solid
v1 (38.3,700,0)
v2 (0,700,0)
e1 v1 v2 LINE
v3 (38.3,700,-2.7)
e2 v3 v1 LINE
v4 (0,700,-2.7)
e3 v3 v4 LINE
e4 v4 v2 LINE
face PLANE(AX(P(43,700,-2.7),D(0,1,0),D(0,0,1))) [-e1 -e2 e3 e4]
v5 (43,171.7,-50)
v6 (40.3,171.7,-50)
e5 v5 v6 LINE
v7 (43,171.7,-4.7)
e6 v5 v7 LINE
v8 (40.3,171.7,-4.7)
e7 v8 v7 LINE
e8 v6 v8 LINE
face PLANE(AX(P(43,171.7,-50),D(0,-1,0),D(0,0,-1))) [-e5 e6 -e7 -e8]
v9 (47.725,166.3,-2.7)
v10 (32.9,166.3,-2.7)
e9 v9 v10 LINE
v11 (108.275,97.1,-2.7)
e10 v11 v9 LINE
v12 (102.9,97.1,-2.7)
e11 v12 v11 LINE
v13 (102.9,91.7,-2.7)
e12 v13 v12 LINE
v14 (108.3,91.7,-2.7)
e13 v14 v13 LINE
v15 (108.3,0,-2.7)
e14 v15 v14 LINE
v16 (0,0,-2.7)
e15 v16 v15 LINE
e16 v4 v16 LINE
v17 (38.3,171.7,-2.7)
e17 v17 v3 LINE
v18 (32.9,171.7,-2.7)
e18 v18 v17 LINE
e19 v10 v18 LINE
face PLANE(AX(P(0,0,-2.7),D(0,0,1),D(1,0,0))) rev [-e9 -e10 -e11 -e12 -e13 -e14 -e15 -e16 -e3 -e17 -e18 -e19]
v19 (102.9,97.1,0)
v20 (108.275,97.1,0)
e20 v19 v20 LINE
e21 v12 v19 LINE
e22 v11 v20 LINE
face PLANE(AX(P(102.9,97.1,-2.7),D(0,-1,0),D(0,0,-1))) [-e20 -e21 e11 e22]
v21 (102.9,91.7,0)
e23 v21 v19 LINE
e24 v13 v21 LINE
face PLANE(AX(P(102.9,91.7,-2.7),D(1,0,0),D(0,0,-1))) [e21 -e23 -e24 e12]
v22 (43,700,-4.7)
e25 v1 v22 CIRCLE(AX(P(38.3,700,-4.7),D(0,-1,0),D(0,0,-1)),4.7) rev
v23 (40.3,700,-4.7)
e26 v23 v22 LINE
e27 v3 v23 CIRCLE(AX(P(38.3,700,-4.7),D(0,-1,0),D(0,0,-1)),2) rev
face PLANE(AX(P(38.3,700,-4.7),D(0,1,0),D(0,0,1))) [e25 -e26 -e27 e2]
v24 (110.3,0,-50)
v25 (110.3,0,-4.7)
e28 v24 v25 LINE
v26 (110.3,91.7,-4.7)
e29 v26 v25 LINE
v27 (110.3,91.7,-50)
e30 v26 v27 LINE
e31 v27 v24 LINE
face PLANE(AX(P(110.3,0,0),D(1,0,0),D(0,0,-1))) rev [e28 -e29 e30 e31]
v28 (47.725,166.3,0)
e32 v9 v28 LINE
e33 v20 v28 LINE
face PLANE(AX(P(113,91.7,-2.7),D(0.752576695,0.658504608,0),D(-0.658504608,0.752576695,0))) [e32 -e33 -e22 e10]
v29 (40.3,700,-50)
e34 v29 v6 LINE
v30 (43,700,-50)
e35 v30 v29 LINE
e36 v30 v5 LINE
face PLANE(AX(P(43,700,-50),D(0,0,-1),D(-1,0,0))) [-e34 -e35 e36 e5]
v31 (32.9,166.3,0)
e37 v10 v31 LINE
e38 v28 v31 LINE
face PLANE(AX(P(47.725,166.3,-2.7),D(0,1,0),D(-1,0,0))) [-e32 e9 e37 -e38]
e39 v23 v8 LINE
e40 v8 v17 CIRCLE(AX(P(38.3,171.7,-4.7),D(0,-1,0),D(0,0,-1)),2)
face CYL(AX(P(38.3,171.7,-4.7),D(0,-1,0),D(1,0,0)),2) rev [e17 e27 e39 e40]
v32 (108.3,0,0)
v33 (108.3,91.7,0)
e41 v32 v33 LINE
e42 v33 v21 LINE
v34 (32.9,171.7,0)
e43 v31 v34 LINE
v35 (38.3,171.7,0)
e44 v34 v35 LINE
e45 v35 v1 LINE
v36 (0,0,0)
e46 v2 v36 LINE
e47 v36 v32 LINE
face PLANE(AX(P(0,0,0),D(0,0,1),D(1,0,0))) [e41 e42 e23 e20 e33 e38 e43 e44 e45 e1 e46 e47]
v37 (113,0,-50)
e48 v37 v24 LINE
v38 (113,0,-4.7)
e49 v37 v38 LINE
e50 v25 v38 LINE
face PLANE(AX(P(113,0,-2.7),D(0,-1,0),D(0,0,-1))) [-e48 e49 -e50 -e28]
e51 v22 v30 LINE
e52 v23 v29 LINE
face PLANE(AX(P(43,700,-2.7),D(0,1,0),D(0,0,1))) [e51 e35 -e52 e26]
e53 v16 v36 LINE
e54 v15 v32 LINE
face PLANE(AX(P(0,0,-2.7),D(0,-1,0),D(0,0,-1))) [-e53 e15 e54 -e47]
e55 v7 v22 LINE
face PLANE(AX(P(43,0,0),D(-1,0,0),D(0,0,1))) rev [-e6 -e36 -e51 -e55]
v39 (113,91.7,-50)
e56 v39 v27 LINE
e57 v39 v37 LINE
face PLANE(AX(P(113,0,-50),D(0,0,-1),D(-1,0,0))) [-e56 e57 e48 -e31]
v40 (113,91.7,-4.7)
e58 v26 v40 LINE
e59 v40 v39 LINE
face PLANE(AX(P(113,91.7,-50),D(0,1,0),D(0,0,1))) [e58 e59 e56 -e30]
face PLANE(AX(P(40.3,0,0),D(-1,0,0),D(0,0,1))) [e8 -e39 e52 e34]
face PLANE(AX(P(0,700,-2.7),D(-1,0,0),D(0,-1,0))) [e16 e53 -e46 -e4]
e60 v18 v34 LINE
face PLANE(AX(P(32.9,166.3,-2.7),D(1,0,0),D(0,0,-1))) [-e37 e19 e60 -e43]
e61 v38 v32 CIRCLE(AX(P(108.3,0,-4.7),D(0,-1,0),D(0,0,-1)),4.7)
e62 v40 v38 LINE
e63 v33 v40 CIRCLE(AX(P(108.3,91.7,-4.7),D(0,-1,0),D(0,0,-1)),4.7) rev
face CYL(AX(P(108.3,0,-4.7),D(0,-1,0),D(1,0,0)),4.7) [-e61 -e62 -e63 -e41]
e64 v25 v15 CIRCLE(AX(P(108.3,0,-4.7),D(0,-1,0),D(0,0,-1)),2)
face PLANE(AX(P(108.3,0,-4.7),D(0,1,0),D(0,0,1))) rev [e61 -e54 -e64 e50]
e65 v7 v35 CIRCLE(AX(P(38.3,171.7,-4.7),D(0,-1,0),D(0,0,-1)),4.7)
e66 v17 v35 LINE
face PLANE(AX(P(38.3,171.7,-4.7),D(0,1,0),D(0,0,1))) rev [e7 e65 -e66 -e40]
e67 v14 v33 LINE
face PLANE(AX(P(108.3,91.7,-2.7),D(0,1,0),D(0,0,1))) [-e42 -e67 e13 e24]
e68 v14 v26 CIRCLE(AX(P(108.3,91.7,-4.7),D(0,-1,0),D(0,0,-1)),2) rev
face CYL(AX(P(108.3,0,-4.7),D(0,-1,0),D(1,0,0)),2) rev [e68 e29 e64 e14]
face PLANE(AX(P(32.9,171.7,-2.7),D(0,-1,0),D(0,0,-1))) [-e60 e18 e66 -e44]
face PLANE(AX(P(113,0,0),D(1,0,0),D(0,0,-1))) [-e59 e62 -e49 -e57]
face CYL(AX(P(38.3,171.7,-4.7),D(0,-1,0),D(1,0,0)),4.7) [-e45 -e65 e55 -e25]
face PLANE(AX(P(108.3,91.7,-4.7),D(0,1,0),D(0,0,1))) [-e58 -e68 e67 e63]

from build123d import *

# Parameters (mm, degrees)
BASE_FLANGE1_DEPTH              = 2.7
EDGE_FLANGE1_STRIP_W            = 14.8
EDGE_FLANGE1_STRIP_H            = 2.7
EDGE_FLANGE1_STRIP_CUT_DEPTH    = 91.7
EDGE_FLANGE1_RELIEF_W           = 20.2
EDGE_FLANGE1_RELIEF_H           = 5.4
EDGE_FLANGE1_RELIEF_CUT_DEPTH   = 2.7
EDGE_FLANGE1_STRIP_2_W          = 14.8
EDGE_FLANGE1_STRIP_2_H          = 2.7
EDGE_FLANGE1_STRIP_CUT_2_DEPTH  = 528.3
EDGE_FLANGE1_RELIEF_2_W         = 20.2
EDGE_FLANGE1_RELIEF_2_H         = 5.4
EDGE_FLANGE1_RELIEF_CUT_2_DEPTH = 2.7
EDGE_FLANGE1_DEPTH              = 91.7
EDGE_FLANGE1_BEND_DEPTH         = 528.3


# Sheet-metal steps are written as plain solids
with BuildPart() as part:
    # Sketch1 → Base-Flange1 (new body)
    with BuildSketch(Plane.XY):
        Polygon((43, 700), (0, 700), (0, 0), (113, 0), (113, 91.7), (43, 171.7), align=None)
    extrude(amount=-BASE_FLANGE1_DEPTH)

    # Edge-Flange1 strip (across the edge) → Edge-Flange1 strip cut (cut)
    with BuildSketch(Plane(origin=(113, 91.7, -2.7), x_dir=(-1, 0, 0), z_dir=(0, -1, 0))):
        with Locations((-2.7, -1.35)):
            Rectangle(EDGE_FLANGE1_STRIP_W, EDGE_FLANGE1_STRIP_H)
    extrude(amount=EDGE_FLANGE1_STRIP_CUT_DEPTH, mode=Mode.SUBTRACT)

    # Edge-Flange1 relief (on the sheet) → Edge-Flange1 relief cut (cut)
    with BuildSketch(Plane(origin=(108.3, 91.7, -2.7), x_dir=(-1, 0, 0), z_dir=(0, 0, -1))):
        with Locations((-4.7, 2.7)):
            Rectangle(EDGE_FLANGE1_RELIEF_W, EDGE_FLANGE1_RELIEF_H)
    extrude(amount=-EDGE_FLANGE1_RELIEF_CUT_DEPTH, mode=Mode.SUBTRACT)

    # Edge-Flange1 strip 2 (across the edge) → Edge-Flange1 strip cut 2 (cut)
    with BuildSketch(Plane(origin=(43, 700, -2.7), x_dir=(-1, 0, 0), z_dir=(0, -1, 0))):
        with Locations((-2.7, -1.35)):
            Rectangle(EDGE_FLANGE1_STRIP_2_W, EDGE_FLANGE1_STRIP_2_H)
    extrude(amount=EDGE_FLANGE1_STRIP_CUT_2_DEPTH, mode=Mode.SUBTRACT)

    # Edge-Flange1 relief 2 (on the sheet) → Edge-Flange1 relief cut 2 (cut)
    with BuildSketch(Plane(origin=(38.3, 700, -2.7), x_dir=(-1, 0, 0), z_dir=(0, 0, -1))):
        with Locations((-4.7, -531)):
            Rectangle(EDGE_FLANGE1_RELIEF_2_W, EDGE_FLANGE1_RELIEF_2_H)
    extrude(amount=-EDGE_FLANGE1_RELIEF_CUT_2_DEPTH, mode=Mode.SUBTRACT)

    # Edge-Flange1 section (across the edge) → Edge-Flange1 (add)
    with BuildSketch(Plane(origin=(113, 91.7, -2.7), x_dir=(-1, 0, 0), z_dir=(0, -1, 0))):
        with BuildLine():
            Line((0, 2), (0, 47.3))
            Line((0, 47.3), (2.7, 47.3))
            Line((2.7, 47.3), (2.7, 2))
            ThreePointArc((2.7, 2), (3.285786438, 0.585786438), (4.7, 0))
            Line((4.7, 0), (4.7, -2.7))
            ThreePointArc((4.7, -2.7), (1.376598128, -1.323401872), (0, 2))
        make_face()
    extrude(amount=EDGE_FLANGE1_DEPTH)

    # Edge-Flange1 section 2 (across the edge) → Edge-Flange1 bend (add)
    with BuildSketch(Plane(origin=(43, 700, -2.7), x_dir=(-1, 0, 0), z_dir=(0, -1, 0))):
        with BuildLine():
            Line((0, 2), (0, 47.3))
            Line((0, 47.3), (2.7, 47.3))
            Line((2.7, 47.3), (2.7, 2))
            ThreePointArc((2.7, 2), (3.285786438, 0.585786438), (4.7, 0))
            Line((4.7, 0), (4.7, -2.7))
            ThreePointArc((4.7, -2.7), (1.376598128, -1.323401872), (0, 2))
        make_face()
    extrude(amount=EDGE_FLANGE1_BEND_DEPTH)


solid = part.part
